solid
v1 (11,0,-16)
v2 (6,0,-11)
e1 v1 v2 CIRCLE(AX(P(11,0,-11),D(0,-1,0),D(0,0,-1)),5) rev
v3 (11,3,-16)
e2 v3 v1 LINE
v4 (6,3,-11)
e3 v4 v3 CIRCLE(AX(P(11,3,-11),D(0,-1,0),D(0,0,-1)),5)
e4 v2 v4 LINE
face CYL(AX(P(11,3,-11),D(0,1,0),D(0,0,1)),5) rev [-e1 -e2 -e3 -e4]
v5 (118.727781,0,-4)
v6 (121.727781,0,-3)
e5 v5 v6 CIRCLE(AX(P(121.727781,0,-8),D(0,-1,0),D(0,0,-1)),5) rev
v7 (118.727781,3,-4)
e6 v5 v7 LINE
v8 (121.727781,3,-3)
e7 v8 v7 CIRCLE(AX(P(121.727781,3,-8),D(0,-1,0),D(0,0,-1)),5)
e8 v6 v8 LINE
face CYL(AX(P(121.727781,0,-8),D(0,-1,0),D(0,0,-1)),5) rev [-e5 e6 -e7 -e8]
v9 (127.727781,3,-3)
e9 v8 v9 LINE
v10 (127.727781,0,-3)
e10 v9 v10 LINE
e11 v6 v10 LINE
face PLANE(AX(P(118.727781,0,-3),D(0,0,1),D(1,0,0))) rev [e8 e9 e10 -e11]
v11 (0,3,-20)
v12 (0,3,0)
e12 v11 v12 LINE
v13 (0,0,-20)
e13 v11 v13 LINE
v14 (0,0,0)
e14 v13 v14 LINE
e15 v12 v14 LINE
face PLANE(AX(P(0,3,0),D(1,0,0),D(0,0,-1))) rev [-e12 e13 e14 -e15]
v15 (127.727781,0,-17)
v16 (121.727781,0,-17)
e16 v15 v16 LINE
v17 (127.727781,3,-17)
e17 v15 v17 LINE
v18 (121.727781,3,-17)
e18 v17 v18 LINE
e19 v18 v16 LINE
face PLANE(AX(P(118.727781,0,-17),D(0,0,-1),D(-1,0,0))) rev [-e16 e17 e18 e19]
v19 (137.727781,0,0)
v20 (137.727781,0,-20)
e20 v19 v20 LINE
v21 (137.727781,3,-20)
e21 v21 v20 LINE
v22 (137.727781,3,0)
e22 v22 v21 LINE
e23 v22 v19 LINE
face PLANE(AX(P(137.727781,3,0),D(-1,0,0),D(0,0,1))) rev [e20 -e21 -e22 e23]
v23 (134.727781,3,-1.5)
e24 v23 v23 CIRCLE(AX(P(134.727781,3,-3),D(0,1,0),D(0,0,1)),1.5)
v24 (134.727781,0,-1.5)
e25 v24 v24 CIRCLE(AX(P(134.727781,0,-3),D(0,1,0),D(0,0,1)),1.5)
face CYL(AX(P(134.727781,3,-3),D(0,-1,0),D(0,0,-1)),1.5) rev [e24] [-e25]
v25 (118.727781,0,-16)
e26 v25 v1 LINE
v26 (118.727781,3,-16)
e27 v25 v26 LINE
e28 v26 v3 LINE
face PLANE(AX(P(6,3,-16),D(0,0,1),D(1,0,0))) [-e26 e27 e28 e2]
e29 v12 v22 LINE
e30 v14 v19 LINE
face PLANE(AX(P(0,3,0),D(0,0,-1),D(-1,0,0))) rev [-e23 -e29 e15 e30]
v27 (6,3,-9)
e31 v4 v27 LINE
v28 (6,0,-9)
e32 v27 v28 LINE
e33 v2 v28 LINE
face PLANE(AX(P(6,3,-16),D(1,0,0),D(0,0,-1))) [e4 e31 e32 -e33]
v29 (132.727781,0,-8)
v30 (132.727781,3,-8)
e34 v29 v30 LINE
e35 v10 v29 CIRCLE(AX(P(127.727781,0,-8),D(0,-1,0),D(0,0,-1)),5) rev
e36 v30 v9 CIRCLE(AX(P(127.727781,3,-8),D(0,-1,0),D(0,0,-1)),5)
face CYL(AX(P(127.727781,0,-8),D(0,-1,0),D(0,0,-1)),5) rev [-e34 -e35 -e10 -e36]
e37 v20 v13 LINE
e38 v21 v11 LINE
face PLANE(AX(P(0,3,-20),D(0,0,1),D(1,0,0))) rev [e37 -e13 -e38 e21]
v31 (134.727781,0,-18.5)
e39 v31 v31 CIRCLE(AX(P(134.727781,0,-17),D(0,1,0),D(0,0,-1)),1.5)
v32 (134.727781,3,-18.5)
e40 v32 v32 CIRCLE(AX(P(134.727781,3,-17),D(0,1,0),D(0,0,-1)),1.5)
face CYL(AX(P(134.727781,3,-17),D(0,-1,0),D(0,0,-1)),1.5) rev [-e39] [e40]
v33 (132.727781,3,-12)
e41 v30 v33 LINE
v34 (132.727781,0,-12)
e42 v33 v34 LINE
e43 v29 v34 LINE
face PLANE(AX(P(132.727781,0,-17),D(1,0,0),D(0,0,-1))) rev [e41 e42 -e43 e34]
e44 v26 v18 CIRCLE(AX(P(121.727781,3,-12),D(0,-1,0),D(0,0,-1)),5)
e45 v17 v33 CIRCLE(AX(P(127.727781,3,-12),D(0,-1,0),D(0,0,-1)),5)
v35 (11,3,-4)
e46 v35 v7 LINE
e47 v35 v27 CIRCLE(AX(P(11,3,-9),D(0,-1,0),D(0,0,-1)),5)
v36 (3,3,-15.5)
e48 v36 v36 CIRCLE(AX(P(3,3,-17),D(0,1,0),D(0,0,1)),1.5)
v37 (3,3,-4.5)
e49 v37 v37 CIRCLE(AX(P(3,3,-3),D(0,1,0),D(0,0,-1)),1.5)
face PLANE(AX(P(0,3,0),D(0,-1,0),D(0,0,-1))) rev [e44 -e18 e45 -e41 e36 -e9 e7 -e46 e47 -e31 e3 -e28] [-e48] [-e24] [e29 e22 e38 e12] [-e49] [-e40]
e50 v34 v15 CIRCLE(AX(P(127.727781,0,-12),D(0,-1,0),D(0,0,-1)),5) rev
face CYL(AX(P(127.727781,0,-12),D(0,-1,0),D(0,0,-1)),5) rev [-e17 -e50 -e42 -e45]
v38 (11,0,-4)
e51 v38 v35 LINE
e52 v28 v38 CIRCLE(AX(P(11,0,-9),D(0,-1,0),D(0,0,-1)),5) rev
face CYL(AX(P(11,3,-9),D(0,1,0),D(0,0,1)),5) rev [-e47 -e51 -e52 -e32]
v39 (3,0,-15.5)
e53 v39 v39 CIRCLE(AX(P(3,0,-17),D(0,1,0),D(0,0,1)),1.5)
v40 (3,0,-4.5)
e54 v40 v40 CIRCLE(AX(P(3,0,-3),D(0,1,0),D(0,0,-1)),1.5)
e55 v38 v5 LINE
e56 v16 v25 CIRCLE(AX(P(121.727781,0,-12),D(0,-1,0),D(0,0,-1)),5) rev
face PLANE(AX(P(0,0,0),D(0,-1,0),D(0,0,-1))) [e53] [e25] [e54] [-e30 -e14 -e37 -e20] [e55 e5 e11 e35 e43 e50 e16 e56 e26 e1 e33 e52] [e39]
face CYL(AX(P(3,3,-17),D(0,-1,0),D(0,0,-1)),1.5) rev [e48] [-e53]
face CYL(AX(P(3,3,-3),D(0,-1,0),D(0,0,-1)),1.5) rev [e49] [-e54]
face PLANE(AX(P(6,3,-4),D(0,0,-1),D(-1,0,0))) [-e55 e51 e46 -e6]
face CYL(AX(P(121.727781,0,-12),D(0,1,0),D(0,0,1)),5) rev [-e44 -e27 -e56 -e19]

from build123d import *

# Parameters (mm, degrees)
SKETCH1_W           = 137.727780531
SKETCH1_H           = 20
SKETCH1_R           = 1.5
SKETCH1_W_2         = 125.727780531
SKETCH1_H_2         = 12
BOSS_EXTRUDE1_DEPTH = 3
CUT_EXTRUDE1_DEPTH  = 140.204674958
FILLET1_R           = 5


with BuildPart() as part:
    # Sketch1 → Boss-Extrude1 (new body)
    with BuildSketch(Plane(origin=(0, 0, 0), x_dir=(1, 0, 0), z_dir=(0, 1, 0))):
        with Locations((68.863890266, 10)):
            Rectangle(SKETCH1_W, SKETCH1_H)
        with Locations(Location((3, 17, 0), (0, 0, 270))):
            Circle(SKETCH1_R, mode=Mode.SUBTRACT)
        with Locations(Location((3, 3, 0), (0, 0, 90))):
            Circle(SKETCH1_R, mode=Mode.SUBTRACT)
        with Locations(Location((134.727780531, 3, 0), (0, 0, 270))):
            Circle(SKETCH1_R, mode=Mode.SUBTRACT)
        with Locations(Location((134.727780531, 17, 0), (0, 0, 90))):
            Circle(SKETCH1_R, mode=Mode.SUBTRACT)
        with Locations((68.863890266, 10)):
            Rectangle(SKETCH1_W_2, SKETCH1_H_2, mode=Mode.SUBTRACT)
    extrude(amount=BOSS_EXTRUDE1_DEPTH)

    # Sketch2 → Cut-Extrude1 (cut, through all)
    with BuildSketch(Plane(origin=(0, 3, 0), x_dir=(1, 0, 0), z_dir=(0, 1, 0))):
        Polygon((118.727780531, 17), (118.727780531, 16), (131.727780531, 16), (131.727780531, 4), (118.727780531, 4), (118.727780531, 3), (132.727780531, 3), (132.727780531, 17), align=None)
    extrude(amount=-CUT_EXTRUDE1_DEPTH, mode=Mode.SUBTRACT)

    # Fillet1
    # the kernel refuses this fillet: 5 mm, written as the material it adds along each edge
    with BuildSketch(Plane(origin=(132.727780531, 3, -17), x_dir=(0, 0, 1), z_dir=(0, -1, 0)), Plane(origin=(132.727780531, 3, -3), x_dir=(-1, 0, 0), z_dir=(0, -1, 0)), Plane(origin=(6, 0, -16), x_dir=(0, 0, 1), z_dir=(0, 1, 0))) as fillet1_piece_1:
        with BuildLine():
            CenterArc((FILLET1_R, FILLET1_R), FILLET1_R, 180, 90)
            Line((0, FILLET1_R), (-FILLET1_R * 0.02, FILLET1_R))
            Line((-FILLET1_R * 0.02, FILLET1_R), (-FILLET1_R * 0.02, -FILLET1_R * 0.02))
            Line((-FILLET1_R * 0.02, -FILLET1_R * 0.02), (FILLET1_R, -FILLET1_R * 0.02))
            Line((FILLET1_R, -FILLET1_R * 0.02), (FILLET1_R, 0))
        make_face()
    extrude(amount=3)
    with BuildSketch(Plane(origin=(118.727780531, 3, -17), x_dir=(1, 0, 0), z_dir=(0, -1, 0))) as fillet1_piece_2:
        with BuildLine():
            CenterArc((3, 5), FILLET1_R, 233.130102354, 36.869897646)
            Line((0, 1), (-0.06, 0.92))
            ThreePointArc((-0.06, 0.92), (-0.1, 0.5), (-0.1, 0))
            Line((-0.1, 0), (0, -0.1))
            Line((0, -0.1), (3, -0.1))
            Line((3, -0.1), (3, 0))
        make_face()
    extrude(amount=3)
    with BuildSketch(Plane(origin=(118.727780531, 3, -3), x_dir=(0, 0, -1), z_dir=(0, -1, 0))) as fillet1_piece_3:
        with BuildLine():
            CenterArc((5, 3), FILLET1_R, 180, 36.869897646)
            Line((0, 3), (-0.1, 3))
            Line((-0.1, 3), (-0.1, 0))
            Line((-0.1, 0), (0, -0.1))
            ThreePointArc((0, -0.1), (0.5, -0.1), (0.92, -0.06))
            Line((0.92, -0.06), (1, 0))
        make_face()
    extrude(amount=3)
    with BuildSketch(Plane(origin=(6, 0, -4), x_dir=(0, 0, -1), z_dir=(0, 1, 0))) as fillet1_piece_4:
        with BuildLine():
            CenterArc((FILLET1_R, -FILLET1_R), FILLET1_R, 90, 90)
            Line((0, -FILLET1_R), (-FILLET1_R * 0.02, -FILLET1_R))
            Line((-FILLET1_R * 0.02, -FILLET1_R), (-FILLET1_R * 0.02, FILLET1_R * 0.02))
            Line((-FILLET1_R * 0.02, FILLET1_R * 0.02), (FILLET1_R, FILLET1_R * 0.02))
            Line((FILLET1_R, FILLET1_R * 0.02), (FILLET1_R, 0))
        make_face()
    extrude(amount=3)


solid = part.part
